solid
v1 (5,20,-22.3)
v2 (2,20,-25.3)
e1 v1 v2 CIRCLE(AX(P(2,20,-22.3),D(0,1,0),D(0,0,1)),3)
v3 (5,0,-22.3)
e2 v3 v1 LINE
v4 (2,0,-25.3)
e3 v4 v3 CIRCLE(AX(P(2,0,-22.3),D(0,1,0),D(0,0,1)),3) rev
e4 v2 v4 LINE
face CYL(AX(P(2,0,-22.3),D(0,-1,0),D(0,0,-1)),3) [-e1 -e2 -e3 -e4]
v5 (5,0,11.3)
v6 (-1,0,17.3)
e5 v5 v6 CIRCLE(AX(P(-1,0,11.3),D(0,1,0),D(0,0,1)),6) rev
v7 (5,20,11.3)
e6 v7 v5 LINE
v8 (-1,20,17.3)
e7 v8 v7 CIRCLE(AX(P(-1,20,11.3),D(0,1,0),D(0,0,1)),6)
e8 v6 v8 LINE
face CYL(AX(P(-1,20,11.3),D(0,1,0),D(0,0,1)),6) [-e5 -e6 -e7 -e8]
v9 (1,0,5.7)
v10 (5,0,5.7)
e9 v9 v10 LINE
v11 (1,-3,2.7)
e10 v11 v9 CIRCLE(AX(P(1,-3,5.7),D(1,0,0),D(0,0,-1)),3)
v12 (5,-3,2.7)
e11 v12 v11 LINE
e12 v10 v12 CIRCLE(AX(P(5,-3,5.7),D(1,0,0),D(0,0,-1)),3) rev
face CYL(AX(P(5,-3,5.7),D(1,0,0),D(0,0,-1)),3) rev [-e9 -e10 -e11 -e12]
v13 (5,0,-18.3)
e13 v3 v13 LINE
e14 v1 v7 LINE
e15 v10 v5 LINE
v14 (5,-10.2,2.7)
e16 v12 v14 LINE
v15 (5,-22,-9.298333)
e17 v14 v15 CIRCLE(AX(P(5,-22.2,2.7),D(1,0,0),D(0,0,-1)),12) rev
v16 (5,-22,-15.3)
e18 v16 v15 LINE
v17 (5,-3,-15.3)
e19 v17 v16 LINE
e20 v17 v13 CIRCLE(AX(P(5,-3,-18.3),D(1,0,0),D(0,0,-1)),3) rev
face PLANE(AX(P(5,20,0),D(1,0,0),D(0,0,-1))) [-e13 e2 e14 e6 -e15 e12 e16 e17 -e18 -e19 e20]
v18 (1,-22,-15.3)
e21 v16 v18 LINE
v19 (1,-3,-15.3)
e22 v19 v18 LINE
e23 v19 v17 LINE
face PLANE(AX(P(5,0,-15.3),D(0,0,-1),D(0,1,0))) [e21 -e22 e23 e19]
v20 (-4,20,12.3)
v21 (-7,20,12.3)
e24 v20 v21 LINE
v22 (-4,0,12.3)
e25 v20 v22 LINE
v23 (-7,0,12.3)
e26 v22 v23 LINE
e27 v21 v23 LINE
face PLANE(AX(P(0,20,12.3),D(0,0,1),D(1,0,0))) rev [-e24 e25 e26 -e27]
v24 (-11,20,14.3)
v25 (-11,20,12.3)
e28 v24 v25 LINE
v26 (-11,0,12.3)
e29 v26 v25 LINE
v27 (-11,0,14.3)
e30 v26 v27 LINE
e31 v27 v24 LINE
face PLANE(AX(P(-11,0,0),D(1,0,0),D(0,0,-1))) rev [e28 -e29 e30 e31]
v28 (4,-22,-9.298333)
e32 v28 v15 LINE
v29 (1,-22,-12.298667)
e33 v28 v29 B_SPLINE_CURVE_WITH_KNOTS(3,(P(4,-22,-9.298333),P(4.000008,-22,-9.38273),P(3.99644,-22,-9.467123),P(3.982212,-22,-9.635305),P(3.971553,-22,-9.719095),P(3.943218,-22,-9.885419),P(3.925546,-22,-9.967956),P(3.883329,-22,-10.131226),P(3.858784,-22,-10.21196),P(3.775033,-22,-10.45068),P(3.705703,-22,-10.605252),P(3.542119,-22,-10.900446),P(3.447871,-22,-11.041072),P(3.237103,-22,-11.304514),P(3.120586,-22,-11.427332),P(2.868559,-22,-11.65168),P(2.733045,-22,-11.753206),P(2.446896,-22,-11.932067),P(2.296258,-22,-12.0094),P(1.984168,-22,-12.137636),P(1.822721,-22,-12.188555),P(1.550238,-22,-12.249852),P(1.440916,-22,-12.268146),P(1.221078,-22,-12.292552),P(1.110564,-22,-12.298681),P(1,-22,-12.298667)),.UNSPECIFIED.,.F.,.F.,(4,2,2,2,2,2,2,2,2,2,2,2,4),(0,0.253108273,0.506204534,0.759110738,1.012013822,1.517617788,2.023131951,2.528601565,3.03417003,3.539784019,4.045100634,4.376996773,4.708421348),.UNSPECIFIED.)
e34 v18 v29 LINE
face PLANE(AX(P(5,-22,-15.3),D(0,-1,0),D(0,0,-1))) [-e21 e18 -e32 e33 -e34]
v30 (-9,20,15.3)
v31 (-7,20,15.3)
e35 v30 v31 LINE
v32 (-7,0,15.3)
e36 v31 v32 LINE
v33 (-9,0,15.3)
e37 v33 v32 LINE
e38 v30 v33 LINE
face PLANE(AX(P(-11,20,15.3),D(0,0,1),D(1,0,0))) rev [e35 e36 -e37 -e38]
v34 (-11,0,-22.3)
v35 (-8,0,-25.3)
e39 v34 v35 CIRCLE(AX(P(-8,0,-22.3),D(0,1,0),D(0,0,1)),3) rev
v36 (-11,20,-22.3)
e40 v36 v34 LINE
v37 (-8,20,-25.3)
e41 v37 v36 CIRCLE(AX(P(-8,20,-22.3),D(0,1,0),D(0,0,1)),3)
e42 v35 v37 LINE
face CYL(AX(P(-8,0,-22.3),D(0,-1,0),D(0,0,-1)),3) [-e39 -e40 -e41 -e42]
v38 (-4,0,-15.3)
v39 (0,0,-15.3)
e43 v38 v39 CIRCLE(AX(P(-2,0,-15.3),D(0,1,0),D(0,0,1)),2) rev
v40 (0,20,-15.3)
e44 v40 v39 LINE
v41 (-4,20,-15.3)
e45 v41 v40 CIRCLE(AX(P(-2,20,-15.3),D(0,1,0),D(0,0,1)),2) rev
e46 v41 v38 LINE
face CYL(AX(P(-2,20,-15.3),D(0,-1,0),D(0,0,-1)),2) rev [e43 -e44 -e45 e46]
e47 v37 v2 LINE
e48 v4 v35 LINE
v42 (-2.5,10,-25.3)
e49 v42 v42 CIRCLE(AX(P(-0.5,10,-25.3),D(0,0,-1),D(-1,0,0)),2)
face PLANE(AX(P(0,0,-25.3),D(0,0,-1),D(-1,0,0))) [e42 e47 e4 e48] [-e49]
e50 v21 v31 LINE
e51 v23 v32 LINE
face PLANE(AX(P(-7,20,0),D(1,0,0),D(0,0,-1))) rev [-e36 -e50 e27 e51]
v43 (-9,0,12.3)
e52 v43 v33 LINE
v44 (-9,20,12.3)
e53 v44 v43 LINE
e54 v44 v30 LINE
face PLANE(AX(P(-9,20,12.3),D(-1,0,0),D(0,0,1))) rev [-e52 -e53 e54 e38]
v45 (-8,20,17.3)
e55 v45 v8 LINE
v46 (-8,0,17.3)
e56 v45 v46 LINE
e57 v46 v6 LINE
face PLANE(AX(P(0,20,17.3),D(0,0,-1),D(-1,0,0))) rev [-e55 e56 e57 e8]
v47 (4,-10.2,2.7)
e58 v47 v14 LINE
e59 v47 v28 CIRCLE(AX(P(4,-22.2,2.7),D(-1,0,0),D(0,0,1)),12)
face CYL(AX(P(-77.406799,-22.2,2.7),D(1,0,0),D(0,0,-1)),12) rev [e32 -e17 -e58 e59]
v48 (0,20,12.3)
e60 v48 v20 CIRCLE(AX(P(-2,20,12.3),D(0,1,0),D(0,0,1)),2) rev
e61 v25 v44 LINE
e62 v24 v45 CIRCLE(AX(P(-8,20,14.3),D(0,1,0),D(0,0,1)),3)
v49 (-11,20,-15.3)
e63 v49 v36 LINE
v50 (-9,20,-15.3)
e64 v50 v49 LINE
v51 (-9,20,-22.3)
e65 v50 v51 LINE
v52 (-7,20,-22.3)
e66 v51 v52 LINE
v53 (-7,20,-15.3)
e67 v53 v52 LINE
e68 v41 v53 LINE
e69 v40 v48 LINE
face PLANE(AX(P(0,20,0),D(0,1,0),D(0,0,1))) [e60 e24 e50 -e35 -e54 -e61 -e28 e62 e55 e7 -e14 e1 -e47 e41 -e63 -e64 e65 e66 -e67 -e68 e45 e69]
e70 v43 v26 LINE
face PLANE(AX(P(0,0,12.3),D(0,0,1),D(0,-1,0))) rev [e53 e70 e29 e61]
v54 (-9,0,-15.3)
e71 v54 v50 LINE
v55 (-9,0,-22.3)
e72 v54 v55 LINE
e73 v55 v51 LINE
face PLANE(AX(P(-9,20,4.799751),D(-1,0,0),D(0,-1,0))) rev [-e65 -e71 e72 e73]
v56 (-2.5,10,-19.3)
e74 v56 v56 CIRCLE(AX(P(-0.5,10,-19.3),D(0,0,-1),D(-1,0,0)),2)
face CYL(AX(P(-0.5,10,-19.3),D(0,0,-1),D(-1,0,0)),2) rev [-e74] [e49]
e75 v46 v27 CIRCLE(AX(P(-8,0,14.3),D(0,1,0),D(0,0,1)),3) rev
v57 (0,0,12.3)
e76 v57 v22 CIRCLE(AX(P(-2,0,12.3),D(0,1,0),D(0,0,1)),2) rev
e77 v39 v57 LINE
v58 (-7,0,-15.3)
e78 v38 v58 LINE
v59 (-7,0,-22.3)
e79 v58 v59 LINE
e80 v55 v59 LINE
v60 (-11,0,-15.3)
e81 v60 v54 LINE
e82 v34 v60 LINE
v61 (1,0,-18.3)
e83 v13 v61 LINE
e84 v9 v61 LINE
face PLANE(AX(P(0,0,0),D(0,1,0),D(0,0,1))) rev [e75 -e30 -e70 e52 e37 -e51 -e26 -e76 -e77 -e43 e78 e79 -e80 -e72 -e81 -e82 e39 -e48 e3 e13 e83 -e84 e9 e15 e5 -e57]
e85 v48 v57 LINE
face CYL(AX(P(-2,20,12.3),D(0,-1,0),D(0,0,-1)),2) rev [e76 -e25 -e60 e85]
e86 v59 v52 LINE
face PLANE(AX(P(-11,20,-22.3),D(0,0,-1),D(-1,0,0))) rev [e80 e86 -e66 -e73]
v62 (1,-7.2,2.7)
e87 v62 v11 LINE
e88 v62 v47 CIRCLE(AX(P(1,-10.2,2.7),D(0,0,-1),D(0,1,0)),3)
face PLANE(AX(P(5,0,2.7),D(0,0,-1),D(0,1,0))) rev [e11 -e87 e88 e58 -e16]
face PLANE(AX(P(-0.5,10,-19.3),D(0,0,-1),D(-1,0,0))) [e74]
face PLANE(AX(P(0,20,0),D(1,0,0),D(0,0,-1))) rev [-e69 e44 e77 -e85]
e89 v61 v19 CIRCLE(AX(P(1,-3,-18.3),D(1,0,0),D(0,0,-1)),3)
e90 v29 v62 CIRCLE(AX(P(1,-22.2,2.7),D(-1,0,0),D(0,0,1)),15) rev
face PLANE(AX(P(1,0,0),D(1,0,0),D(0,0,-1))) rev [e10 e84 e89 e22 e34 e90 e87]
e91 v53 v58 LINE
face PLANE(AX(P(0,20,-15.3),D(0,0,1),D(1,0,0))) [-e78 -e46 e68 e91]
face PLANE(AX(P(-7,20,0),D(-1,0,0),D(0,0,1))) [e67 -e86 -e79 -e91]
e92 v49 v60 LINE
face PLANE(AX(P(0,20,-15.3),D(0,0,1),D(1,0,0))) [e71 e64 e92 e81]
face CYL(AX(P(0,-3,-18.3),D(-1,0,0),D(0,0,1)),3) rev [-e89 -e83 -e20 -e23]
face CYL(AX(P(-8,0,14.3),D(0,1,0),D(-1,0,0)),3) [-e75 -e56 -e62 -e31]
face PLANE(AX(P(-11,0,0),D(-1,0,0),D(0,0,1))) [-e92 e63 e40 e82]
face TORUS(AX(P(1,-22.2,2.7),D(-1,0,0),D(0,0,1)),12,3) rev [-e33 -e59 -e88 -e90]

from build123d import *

# Parameters (mm, degrees)
BOSS_EXTRUDE1_DEPTH     = 20
SKETCH3_W               = 12
SKETCH3_H               = 20
BOSS_EXTRUDE2_DEPTH     = 5
FILLET1_R               = 6
FILLET2_R               = 3
SKETCH4_R               = 2
CUT_EXTRUDE1_DEPTH      = 6
SKETCH5_W               = 2
SKETCH5_H               = 20
SKETCH5_W_2             = 3
BOSS_EXTRUDE3_DEPTH     = 4
SKETCH6_W               = 2
SKETCH6_H               = 20
BOSS_EXTRUDE4_DEPTH     = 3
SKETCH7_W               = 2
SKETCH7_H               = 20
BOSS_EXTRUDE5_DEPTH     = 7
FILLET3_R               = 3
SKETCH8_W               = 18
SKETCH8_H               = 22
BOSS_EXTRUDE6_DEPTH     = 5
CUT_EXTRUDE2_DEPTH      = 36.285832851
CUT_EXTRUDE2_DEPTH_BACK = 4
CUT_EXTRUDE3_DEPTH      = 36.285832851
CUT_EXTRUDE3_DEPTH_BACK = 36.285832851
FILLET4_R               = 3
SKETCH11_W              = 18
SKETCH11_H              = 22
CUT_EXTRUDE4_DEPTH      = 1
FILLET5_R               = 3


with BuildPart() as part:
    # Sketch1 → Boss-Extrude1 (new body)
    with BuildSketch(Plane(origin=(0, 0, 0), x_dir=(1, 0, 0), z_dir=(0, 1, 0))):
        with BuildLine():
            Line((0, 15.3), (0, -12.3))
            ThreePointArc((0, -12.3), (-2, -14.3), (-4, -12.3))
            Line((-4, -12.3), (-7, -12.3))
            Line((-7, -12.3), (-7, -17.3))
            Line((-7, -17.3), (5, -17.3))
            Line((5, -17.3), (5, 20.3))
            Line((5, 20.3), (-7, 20.3))
            Line((-7, 20.3), (-7, 15.3))
            Line((-7, 15.3), (-4, 15.3))
            ThreePointArc((-4, 15.3), (-2, 17.3), (0, 15.3))
        make_face()
    extrude(amount=BOSS_EXTRUDE1_DEPTH)

    # Sketch3 → Boss-Extrude2 (add)
    with BuildSketch(Plane(origin=(0, 0, -20.3), x_dir=(-1, 0, 0), z_dir=(0, 0, -1))):
        with Locations((1, 10)):
            Rectangle(SKETCH3_W, SKETCH3_H)
    extrude(amount=BOSS_EXTRUDE2_DEPTH)

    # Fillet1
    fillet1_edges = [part.edges().sort_by_distance(p)[0] for p in [
        (5, 10, 17.3),
    ]]
    fillet(fillet1_edges, radius=FILLET1_R)

    # Fillet2
    fillet2_edges = [part.edges().sort_by_distance(p)[0] for p in [
        (5, 10, -25.3),
    ]]
    fillet(fillet2_edges, radius=FILLET2_R)

    # Sketch4 → Cut-Extrude1 (cut)
    with BuildSketch(Plane(origin=(0, 0, -25.3), x_dir=(-1, 0, 0), z_dir=(0, 0, -1))):
        with Locations((0.5, 10)):
            Circle(SKETCH4_R)
    extrude(amount=-CUT_EXTRUDE1_DEPTH, mode=Mode.SUBTRACT)

    # Sketch5 → Boss-Extrude3 (add)
    with BuildSketch(Plane.ZY.offset(7)):
        with Locations((16.3, 10)):
            Rectangle(SKETCH5_W, SKETCH5_H)
        with Locations((-23.8, 10)):
            Rectangle(SKETCH5_W_2, SKETCH5_H)
    extrude(amount=BOSS_EXTRUDE3_DEPTH)

    # Sketch6 → Boss-Extrude4 (add)
    with BuildSketch(Plane(origin=(0, 0, 15.3), x_dir=(-1, 0, 0), z_dir=(0, 0, -1))):
        with Locations((10, 10)):
            Rectangle(SKETCH6_W, SKETCH6_H)
    extrude(amount=BOSS_EXTRUDE4_DEPTH)

    # Sketch7 → Boss-Extrude5 (add)
    with BuildSketch(Plane.XY.offset(-22.3)):
        with Locations((-10, 10)):
            Rectangle(SKETCH7_W, SKETCH7_H)
    extrude(amount=BOSS_EXTRUDE5_DEPTH)

    # Fillet3
    fillet3_edges = [part.edges().sort_by_distance(p)[0] for p in [
        (-11, 10, 17.3),
        (-11, 10, -25.3),
    ]]
    fillet(fillet3_edges, radius=FILLET3_R)

    # Sketch8 → Boss-Extrude6 (add)
    with BuildSketch(Plane.ZY):
        with Locations((-6.3, -11)):
            Rectangle(SKETCH8_W, SKETCH8_H)
    extrude(amount=-BOSS_EXTRUDE6_DEPTH)

    # Sketch9 → Cut-Extrude2 (cut, two sides: drawn at the far end of the back side and taken through both)
    with BuildSketch(Plane.ZY.offset(-CUT_EXTRUDE2_DEPTH_BACK)):
        with BuildLine():
            Line((2.7, -10.2), (2.7, -7.2))
            ThreePointArc((2.7, -7.2), (-7.835653753, -11.522921748), (-12.298666607, -22))
            Line((-12.298666607, -22), (-9.298333218, -22))
            ThreePointArc((-9.298333218, -22), (-5.714273587, -13.644300146), (2.7, -10.2))
        make_face()
    extrude(amount=CUT_EXTRUDE2_DEPTH + CUT_EXTRUDE2_DEPTH_BACK, mode=Mode.SUBTRACT)

    # Sketch9<3> → Cut-Extrude3 (cut, two sides: drawn at the far end of the back side and taken through both)
    with BuildSketch(Plane.ZY.offset(-CUT_EXTRUDE3_DEPTH_BACK)):
        with BuildLine():
            Line((2.7, -22), (2.7, -10.2))
            ThreePointArc((2.7, -10.2), (-5.714273587, -13.644300146), (-9.298333218, -22))
            Line((-9.298333218, -22), (2.7, -22))
        make_face()
    extrude(amount=CUT_EXTRUDE3_DEPTH + CUT_EXTRUDE3_DEPTH_BACK, mode=Mode.SUBTRACT)

    # Fillet4
    fillet4_edges = [part.edges().sort_by_distance(p)[0] for p in [
        (4, -11.522921748, -7.835653753),
    ]]
    fillet(fillet4_edges, radius=FILLET4_R - 0.0001)  # a hair under: the kernel refuses the full size

    # Sketch11 → Cut-Extrude4 (cut)
    with BuildSketch(Plane.ZY):
        with Locations((-6.3, -11)):
            Rectangle(SKETCH11_W, SKETCH11_H)
    extrude(amount=-CUT_EXTRUDE4_DEPTH, mode=Mode.SUBTRACT)

    # Fillet5
    fillet5_edges = [part.edges().sort_by_distance(p)[0] for p in [
        (3, 0, -15.3),
        (3, 0, 2.7),
    ]]
    fillet(fillet5_edges, radius=FILLET5_R)


solid = part.part
